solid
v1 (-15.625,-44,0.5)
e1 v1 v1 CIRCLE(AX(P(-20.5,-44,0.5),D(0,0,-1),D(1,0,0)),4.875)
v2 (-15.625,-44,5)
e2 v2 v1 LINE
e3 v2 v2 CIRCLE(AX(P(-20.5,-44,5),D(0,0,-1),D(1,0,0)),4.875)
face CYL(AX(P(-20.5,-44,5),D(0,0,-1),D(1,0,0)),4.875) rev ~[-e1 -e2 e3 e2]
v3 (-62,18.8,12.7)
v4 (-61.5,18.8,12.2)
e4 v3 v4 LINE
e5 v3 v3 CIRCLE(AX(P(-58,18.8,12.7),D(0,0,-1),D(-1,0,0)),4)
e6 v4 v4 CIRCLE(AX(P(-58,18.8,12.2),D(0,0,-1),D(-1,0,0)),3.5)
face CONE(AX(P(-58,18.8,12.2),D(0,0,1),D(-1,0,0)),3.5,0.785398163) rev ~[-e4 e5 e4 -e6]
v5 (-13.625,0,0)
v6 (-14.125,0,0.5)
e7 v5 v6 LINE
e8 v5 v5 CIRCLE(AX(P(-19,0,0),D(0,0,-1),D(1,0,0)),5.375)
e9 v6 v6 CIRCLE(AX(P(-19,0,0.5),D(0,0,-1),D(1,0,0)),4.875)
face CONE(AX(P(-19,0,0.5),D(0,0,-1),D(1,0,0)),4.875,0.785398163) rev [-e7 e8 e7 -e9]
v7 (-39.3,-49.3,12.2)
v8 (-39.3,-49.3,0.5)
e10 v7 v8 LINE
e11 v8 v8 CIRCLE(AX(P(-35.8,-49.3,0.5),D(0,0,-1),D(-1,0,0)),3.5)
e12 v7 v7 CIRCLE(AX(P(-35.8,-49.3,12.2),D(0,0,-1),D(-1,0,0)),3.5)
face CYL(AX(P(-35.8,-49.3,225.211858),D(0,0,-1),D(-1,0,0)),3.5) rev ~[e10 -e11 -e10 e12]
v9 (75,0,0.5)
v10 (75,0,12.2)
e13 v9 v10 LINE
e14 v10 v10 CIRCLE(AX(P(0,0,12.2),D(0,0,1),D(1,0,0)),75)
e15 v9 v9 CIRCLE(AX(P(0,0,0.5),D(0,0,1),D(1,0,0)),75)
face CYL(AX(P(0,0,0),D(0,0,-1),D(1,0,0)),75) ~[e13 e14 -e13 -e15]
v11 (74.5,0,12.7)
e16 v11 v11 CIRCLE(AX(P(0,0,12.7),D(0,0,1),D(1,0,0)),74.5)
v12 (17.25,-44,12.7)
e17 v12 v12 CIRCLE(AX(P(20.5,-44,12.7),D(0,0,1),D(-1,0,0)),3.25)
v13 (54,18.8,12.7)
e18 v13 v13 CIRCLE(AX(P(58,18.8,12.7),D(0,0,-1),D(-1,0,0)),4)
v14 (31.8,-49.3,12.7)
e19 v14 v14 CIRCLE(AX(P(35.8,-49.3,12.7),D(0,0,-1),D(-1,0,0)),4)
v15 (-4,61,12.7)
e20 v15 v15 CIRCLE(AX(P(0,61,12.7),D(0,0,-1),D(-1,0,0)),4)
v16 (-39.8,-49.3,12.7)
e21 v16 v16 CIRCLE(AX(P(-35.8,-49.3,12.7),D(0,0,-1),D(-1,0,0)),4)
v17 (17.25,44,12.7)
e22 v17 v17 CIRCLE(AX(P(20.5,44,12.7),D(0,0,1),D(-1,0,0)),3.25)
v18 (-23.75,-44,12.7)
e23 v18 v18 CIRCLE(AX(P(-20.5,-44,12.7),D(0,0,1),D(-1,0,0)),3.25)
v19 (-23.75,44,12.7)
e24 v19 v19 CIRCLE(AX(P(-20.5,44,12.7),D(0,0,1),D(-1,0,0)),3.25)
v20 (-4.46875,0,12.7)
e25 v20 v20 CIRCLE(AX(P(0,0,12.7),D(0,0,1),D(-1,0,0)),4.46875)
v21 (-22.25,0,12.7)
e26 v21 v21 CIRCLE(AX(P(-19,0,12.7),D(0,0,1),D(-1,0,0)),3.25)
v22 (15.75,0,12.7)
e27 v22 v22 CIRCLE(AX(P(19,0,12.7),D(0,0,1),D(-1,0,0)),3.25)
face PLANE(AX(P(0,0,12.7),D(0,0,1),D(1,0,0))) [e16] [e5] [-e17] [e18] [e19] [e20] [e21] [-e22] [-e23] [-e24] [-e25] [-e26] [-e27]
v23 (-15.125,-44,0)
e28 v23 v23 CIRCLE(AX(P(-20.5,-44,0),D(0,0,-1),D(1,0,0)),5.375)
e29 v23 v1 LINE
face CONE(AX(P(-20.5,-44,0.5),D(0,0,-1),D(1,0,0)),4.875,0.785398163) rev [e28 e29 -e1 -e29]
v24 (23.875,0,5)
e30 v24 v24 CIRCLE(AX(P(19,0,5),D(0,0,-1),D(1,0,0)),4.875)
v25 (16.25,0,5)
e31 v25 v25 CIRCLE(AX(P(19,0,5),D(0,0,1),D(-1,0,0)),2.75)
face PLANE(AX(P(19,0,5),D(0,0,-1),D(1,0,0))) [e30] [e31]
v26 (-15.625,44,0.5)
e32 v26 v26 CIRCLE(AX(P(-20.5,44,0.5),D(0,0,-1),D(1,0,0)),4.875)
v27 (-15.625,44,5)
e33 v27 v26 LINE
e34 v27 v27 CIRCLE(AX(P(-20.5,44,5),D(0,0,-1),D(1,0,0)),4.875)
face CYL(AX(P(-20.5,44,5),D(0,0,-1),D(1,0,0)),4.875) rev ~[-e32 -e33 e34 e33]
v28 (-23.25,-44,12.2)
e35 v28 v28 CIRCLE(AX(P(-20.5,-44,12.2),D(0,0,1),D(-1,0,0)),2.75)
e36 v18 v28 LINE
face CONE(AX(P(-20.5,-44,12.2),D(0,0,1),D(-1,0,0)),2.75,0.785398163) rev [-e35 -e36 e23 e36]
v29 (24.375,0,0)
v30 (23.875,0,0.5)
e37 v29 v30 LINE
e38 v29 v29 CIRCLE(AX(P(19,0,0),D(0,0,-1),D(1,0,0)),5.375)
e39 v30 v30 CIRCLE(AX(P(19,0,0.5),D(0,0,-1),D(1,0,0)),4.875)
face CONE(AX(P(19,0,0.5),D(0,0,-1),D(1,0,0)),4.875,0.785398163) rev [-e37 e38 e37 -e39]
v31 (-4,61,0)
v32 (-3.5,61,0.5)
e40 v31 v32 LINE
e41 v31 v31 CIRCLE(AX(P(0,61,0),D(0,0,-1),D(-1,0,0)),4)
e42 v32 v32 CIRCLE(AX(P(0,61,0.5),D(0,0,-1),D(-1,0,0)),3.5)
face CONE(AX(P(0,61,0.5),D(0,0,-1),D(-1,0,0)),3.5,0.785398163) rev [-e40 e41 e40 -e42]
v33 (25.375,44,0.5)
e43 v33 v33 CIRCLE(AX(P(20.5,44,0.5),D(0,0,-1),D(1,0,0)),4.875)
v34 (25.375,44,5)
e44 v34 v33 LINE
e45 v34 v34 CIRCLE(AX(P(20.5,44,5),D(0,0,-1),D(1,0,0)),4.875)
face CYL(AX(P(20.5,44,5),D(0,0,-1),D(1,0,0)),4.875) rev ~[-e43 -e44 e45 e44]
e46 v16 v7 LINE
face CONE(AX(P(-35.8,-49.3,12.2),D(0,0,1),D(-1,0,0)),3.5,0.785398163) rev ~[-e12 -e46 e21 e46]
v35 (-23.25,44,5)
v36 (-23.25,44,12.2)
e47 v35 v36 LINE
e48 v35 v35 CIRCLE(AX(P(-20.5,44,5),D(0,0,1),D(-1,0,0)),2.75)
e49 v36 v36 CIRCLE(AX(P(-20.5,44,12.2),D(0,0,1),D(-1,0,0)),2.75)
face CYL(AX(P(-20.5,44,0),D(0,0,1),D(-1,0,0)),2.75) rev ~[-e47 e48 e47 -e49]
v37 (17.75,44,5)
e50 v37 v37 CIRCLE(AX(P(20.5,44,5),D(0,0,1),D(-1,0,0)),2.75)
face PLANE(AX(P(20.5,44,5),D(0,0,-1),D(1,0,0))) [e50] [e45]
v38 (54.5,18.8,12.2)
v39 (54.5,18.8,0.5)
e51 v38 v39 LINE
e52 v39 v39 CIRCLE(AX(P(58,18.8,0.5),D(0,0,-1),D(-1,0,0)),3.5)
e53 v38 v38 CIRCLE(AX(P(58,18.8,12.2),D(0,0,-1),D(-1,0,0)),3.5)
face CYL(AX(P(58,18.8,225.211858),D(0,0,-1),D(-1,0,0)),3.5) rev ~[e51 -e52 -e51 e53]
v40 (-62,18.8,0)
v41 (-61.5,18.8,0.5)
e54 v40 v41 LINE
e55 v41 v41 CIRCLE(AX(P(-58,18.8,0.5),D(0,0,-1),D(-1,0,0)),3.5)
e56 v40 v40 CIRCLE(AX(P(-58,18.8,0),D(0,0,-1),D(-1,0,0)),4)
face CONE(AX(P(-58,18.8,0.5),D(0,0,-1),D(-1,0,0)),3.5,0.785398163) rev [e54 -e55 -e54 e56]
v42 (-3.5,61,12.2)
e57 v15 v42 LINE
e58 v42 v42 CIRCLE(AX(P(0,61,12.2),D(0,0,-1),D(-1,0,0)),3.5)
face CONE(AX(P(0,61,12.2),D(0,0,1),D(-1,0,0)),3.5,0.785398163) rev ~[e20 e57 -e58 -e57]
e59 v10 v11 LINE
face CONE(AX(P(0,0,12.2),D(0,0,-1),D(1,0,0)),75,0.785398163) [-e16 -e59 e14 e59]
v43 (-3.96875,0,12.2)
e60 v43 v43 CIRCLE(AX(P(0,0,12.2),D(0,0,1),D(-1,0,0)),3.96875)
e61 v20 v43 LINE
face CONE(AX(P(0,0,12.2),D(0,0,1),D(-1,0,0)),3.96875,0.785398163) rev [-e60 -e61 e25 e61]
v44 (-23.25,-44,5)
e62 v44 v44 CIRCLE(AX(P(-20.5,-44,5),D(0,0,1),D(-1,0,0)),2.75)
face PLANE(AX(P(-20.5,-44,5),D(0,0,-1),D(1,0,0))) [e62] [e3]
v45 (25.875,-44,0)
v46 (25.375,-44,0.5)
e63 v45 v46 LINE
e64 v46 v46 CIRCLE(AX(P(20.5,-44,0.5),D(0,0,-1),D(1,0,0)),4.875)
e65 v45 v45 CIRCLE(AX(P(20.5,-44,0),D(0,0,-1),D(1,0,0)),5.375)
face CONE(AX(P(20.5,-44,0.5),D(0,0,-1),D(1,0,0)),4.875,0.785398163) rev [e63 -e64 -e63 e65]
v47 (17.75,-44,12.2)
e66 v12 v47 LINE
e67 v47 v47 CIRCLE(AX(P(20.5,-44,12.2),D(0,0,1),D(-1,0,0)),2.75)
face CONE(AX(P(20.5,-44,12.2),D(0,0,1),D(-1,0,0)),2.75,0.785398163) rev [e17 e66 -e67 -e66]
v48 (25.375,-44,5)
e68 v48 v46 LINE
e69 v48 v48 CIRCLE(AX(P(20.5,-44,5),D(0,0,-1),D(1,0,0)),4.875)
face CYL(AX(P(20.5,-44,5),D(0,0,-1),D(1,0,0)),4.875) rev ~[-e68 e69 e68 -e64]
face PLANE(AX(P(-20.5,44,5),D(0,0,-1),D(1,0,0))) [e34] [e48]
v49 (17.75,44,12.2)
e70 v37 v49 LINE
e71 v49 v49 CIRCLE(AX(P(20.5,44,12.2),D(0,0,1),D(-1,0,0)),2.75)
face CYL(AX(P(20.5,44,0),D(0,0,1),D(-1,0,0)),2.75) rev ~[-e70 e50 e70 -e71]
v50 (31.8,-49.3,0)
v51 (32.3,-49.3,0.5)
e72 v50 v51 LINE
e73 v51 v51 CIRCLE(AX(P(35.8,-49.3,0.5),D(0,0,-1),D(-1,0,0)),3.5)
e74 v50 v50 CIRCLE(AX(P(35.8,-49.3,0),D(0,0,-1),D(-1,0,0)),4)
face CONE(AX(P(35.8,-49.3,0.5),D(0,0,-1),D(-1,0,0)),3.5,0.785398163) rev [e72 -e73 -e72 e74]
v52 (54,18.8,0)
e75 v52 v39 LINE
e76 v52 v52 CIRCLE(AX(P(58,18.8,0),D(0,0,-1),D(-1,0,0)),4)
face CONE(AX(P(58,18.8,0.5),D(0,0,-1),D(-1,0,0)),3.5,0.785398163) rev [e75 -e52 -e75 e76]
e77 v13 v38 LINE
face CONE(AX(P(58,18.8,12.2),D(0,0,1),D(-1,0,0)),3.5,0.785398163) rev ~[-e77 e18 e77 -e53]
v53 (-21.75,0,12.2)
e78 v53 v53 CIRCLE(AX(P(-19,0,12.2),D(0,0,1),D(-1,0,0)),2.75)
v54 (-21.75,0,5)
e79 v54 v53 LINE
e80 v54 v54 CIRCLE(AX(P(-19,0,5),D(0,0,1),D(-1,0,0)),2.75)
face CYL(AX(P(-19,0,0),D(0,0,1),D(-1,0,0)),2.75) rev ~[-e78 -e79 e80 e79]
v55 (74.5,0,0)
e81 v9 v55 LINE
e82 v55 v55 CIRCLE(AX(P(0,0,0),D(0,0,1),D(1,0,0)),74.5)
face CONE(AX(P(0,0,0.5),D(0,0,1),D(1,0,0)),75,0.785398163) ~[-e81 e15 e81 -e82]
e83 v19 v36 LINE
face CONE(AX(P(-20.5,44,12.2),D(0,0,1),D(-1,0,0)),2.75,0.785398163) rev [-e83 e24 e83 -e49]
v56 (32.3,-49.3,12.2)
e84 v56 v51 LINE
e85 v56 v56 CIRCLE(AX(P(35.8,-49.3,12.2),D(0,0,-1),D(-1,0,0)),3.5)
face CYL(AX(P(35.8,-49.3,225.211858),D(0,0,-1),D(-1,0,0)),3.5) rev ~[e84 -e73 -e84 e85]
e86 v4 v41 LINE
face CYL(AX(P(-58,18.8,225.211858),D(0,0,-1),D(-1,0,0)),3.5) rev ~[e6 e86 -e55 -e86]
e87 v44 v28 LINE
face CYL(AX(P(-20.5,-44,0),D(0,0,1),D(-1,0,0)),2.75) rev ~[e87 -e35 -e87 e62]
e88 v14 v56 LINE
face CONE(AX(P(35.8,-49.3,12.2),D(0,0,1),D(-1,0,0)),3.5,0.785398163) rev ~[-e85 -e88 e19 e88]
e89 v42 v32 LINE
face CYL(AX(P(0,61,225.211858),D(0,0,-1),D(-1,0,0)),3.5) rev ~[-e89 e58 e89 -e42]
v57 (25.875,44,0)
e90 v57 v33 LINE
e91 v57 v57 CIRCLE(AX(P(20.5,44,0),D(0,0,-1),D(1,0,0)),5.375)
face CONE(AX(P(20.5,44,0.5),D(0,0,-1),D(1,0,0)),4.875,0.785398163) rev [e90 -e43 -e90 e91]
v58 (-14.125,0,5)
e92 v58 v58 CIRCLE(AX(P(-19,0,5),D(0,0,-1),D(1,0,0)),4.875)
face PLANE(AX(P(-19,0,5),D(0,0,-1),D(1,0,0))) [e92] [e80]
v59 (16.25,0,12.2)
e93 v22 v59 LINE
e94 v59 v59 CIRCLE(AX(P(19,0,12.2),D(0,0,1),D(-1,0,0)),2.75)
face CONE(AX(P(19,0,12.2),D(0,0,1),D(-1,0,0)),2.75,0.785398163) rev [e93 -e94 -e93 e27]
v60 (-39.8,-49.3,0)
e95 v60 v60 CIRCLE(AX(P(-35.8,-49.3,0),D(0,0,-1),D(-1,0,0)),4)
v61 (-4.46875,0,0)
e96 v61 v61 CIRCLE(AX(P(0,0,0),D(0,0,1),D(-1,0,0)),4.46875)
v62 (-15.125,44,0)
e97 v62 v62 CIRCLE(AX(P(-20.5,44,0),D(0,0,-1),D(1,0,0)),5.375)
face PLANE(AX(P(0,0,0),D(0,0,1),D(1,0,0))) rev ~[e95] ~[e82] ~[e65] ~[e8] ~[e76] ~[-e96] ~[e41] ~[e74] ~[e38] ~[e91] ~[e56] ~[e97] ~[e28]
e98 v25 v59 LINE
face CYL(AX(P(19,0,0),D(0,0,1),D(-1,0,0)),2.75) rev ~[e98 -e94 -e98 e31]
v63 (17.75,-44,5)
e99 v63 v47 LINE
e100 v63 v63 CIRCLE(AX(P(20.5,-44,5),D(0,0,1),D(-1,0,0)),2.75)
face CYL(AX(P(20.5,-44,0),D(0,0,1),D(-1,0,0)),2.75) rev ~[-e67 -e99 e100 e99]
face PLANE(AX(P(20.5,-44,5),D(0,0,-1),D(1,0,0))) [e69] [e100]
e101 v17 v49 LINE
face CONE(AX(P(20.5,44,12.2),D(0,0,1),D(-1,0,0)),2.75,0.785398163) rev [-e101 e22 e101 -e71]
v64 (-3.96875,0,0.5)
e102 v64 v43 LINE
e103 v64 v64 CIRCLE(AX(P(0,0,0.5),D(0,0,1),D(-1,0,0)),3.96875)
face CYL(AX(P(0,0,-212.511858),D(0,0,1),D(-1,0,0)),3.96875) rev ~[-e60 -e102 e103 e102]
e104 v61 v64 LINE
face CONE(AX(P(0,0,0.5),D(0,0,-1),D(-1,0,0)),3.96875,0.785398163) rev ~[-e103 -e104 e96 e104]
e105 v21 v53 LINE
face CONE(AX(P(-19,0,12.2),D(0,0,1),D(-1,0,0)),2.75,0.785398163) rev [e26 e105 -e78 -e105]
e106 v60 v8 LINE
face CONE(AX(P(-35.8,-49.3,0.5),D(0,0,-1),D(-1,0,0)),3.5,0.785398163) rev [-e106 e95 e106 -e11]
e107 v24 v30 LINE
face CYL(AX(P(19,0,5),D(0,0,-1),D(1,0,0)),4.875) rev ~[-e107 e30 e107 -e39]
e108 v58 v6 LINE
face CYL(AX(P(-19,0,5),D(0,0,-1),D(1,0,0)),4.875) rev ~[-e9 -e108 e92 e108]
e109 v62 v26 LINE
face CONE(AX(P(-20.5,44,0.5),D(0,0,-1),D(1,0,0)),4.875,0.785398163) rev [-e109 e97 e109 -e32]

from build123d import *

# Parameters (mm, degrees)
F0_R           = 75
F1_DEPTH       = 12.7
F2_D           = 5.5
F2_CBORE_D     = 9.75
F2_CBORE_DEPTH = 5
F4_D           = 7
F5_D           = 7.9375
F6_SIZE        = 0.5


# Not quite as in the source:
# - a length typed as a fraction of an inch, garbled in the dataset ("3 / 203.2 mm" for 3/8 in), is restored


with BuildPart() as f1:
    # F0 (on Top) → F1 (new body)
    with BuildSketch(Plane.XY):
        Circle(F0_R)
    extrude(amount=F1_DEPTH)

    # F2 (through all)
    with Locations(Plane(origin=(0, 0, 0), x_dir=(1, 0, 0), z_dir=(0, 0, -1))):
        with Locations((-20.5, -44), (20.5, -44), (-19, 0), (19, 0), (-20.5, 44), (20.5, 44)):
            CounterBoreHole(F2_D / 2, F2_CBORE_D / 2, F2_CBORE_DEPTH)

    # F4 (through all)
    with Locations(Plane.XY.offset(12.7)):
        with Locations((0, 61), (58, 18.8), (-58, 18.8), (-35.8, -49.3), (35.8, -49.3)):
            Hole(F4_D / 2)

    # F5 (through all)
    with Locations(Plane(origin=(0, 0, 0), x_dir=(1, 0, 0), z_dir=(0, 0, -1))):
        with Locations((0, 0)):
            Hole(F5_D / 2)

    # F6
    f6_edges = [f1.edges().sort_by_distance(p)[0] for p in [
        (-75, 0, 0),
        (-39.3, -49.3, 0),
        (-25.375, -44, 0),
        (-23.875, 0, 0),
        (15.625, -44, 0),
        (32.3, -49.3, 0),
        (-3.96875, 0, 0),
        (14.125, 0, 0),
        (-61.5, 18.8, 0),
        (-25.375, 44, 0),
        (54.5, 18.8, 0),
        (15.625, 44, 0),
        (-3.5, 61, 0),
        (-75, 0, 12.7),
        (-39.3, -49.3, 12.7),
        (-23.25, -44, 12.7),
        (-21.75, 0, 12.7),
        (17.75, -44, 12.7),
        (32.3, -49.3, 12.7),
        (-3.96875, 0, 12.7),
        (16.25, 0, 12.7),
        (-61.5, 18.8, 12.7),
        (-23.25, 44, 12.7),
        (54.5, 18.8, 12.7),
        (17.75, 44, 12.7),
        (-3.5, 61, 12.7),
    ]]
    chamfer(f6_edges, length=F6_SIZE)


solid = f1.part
